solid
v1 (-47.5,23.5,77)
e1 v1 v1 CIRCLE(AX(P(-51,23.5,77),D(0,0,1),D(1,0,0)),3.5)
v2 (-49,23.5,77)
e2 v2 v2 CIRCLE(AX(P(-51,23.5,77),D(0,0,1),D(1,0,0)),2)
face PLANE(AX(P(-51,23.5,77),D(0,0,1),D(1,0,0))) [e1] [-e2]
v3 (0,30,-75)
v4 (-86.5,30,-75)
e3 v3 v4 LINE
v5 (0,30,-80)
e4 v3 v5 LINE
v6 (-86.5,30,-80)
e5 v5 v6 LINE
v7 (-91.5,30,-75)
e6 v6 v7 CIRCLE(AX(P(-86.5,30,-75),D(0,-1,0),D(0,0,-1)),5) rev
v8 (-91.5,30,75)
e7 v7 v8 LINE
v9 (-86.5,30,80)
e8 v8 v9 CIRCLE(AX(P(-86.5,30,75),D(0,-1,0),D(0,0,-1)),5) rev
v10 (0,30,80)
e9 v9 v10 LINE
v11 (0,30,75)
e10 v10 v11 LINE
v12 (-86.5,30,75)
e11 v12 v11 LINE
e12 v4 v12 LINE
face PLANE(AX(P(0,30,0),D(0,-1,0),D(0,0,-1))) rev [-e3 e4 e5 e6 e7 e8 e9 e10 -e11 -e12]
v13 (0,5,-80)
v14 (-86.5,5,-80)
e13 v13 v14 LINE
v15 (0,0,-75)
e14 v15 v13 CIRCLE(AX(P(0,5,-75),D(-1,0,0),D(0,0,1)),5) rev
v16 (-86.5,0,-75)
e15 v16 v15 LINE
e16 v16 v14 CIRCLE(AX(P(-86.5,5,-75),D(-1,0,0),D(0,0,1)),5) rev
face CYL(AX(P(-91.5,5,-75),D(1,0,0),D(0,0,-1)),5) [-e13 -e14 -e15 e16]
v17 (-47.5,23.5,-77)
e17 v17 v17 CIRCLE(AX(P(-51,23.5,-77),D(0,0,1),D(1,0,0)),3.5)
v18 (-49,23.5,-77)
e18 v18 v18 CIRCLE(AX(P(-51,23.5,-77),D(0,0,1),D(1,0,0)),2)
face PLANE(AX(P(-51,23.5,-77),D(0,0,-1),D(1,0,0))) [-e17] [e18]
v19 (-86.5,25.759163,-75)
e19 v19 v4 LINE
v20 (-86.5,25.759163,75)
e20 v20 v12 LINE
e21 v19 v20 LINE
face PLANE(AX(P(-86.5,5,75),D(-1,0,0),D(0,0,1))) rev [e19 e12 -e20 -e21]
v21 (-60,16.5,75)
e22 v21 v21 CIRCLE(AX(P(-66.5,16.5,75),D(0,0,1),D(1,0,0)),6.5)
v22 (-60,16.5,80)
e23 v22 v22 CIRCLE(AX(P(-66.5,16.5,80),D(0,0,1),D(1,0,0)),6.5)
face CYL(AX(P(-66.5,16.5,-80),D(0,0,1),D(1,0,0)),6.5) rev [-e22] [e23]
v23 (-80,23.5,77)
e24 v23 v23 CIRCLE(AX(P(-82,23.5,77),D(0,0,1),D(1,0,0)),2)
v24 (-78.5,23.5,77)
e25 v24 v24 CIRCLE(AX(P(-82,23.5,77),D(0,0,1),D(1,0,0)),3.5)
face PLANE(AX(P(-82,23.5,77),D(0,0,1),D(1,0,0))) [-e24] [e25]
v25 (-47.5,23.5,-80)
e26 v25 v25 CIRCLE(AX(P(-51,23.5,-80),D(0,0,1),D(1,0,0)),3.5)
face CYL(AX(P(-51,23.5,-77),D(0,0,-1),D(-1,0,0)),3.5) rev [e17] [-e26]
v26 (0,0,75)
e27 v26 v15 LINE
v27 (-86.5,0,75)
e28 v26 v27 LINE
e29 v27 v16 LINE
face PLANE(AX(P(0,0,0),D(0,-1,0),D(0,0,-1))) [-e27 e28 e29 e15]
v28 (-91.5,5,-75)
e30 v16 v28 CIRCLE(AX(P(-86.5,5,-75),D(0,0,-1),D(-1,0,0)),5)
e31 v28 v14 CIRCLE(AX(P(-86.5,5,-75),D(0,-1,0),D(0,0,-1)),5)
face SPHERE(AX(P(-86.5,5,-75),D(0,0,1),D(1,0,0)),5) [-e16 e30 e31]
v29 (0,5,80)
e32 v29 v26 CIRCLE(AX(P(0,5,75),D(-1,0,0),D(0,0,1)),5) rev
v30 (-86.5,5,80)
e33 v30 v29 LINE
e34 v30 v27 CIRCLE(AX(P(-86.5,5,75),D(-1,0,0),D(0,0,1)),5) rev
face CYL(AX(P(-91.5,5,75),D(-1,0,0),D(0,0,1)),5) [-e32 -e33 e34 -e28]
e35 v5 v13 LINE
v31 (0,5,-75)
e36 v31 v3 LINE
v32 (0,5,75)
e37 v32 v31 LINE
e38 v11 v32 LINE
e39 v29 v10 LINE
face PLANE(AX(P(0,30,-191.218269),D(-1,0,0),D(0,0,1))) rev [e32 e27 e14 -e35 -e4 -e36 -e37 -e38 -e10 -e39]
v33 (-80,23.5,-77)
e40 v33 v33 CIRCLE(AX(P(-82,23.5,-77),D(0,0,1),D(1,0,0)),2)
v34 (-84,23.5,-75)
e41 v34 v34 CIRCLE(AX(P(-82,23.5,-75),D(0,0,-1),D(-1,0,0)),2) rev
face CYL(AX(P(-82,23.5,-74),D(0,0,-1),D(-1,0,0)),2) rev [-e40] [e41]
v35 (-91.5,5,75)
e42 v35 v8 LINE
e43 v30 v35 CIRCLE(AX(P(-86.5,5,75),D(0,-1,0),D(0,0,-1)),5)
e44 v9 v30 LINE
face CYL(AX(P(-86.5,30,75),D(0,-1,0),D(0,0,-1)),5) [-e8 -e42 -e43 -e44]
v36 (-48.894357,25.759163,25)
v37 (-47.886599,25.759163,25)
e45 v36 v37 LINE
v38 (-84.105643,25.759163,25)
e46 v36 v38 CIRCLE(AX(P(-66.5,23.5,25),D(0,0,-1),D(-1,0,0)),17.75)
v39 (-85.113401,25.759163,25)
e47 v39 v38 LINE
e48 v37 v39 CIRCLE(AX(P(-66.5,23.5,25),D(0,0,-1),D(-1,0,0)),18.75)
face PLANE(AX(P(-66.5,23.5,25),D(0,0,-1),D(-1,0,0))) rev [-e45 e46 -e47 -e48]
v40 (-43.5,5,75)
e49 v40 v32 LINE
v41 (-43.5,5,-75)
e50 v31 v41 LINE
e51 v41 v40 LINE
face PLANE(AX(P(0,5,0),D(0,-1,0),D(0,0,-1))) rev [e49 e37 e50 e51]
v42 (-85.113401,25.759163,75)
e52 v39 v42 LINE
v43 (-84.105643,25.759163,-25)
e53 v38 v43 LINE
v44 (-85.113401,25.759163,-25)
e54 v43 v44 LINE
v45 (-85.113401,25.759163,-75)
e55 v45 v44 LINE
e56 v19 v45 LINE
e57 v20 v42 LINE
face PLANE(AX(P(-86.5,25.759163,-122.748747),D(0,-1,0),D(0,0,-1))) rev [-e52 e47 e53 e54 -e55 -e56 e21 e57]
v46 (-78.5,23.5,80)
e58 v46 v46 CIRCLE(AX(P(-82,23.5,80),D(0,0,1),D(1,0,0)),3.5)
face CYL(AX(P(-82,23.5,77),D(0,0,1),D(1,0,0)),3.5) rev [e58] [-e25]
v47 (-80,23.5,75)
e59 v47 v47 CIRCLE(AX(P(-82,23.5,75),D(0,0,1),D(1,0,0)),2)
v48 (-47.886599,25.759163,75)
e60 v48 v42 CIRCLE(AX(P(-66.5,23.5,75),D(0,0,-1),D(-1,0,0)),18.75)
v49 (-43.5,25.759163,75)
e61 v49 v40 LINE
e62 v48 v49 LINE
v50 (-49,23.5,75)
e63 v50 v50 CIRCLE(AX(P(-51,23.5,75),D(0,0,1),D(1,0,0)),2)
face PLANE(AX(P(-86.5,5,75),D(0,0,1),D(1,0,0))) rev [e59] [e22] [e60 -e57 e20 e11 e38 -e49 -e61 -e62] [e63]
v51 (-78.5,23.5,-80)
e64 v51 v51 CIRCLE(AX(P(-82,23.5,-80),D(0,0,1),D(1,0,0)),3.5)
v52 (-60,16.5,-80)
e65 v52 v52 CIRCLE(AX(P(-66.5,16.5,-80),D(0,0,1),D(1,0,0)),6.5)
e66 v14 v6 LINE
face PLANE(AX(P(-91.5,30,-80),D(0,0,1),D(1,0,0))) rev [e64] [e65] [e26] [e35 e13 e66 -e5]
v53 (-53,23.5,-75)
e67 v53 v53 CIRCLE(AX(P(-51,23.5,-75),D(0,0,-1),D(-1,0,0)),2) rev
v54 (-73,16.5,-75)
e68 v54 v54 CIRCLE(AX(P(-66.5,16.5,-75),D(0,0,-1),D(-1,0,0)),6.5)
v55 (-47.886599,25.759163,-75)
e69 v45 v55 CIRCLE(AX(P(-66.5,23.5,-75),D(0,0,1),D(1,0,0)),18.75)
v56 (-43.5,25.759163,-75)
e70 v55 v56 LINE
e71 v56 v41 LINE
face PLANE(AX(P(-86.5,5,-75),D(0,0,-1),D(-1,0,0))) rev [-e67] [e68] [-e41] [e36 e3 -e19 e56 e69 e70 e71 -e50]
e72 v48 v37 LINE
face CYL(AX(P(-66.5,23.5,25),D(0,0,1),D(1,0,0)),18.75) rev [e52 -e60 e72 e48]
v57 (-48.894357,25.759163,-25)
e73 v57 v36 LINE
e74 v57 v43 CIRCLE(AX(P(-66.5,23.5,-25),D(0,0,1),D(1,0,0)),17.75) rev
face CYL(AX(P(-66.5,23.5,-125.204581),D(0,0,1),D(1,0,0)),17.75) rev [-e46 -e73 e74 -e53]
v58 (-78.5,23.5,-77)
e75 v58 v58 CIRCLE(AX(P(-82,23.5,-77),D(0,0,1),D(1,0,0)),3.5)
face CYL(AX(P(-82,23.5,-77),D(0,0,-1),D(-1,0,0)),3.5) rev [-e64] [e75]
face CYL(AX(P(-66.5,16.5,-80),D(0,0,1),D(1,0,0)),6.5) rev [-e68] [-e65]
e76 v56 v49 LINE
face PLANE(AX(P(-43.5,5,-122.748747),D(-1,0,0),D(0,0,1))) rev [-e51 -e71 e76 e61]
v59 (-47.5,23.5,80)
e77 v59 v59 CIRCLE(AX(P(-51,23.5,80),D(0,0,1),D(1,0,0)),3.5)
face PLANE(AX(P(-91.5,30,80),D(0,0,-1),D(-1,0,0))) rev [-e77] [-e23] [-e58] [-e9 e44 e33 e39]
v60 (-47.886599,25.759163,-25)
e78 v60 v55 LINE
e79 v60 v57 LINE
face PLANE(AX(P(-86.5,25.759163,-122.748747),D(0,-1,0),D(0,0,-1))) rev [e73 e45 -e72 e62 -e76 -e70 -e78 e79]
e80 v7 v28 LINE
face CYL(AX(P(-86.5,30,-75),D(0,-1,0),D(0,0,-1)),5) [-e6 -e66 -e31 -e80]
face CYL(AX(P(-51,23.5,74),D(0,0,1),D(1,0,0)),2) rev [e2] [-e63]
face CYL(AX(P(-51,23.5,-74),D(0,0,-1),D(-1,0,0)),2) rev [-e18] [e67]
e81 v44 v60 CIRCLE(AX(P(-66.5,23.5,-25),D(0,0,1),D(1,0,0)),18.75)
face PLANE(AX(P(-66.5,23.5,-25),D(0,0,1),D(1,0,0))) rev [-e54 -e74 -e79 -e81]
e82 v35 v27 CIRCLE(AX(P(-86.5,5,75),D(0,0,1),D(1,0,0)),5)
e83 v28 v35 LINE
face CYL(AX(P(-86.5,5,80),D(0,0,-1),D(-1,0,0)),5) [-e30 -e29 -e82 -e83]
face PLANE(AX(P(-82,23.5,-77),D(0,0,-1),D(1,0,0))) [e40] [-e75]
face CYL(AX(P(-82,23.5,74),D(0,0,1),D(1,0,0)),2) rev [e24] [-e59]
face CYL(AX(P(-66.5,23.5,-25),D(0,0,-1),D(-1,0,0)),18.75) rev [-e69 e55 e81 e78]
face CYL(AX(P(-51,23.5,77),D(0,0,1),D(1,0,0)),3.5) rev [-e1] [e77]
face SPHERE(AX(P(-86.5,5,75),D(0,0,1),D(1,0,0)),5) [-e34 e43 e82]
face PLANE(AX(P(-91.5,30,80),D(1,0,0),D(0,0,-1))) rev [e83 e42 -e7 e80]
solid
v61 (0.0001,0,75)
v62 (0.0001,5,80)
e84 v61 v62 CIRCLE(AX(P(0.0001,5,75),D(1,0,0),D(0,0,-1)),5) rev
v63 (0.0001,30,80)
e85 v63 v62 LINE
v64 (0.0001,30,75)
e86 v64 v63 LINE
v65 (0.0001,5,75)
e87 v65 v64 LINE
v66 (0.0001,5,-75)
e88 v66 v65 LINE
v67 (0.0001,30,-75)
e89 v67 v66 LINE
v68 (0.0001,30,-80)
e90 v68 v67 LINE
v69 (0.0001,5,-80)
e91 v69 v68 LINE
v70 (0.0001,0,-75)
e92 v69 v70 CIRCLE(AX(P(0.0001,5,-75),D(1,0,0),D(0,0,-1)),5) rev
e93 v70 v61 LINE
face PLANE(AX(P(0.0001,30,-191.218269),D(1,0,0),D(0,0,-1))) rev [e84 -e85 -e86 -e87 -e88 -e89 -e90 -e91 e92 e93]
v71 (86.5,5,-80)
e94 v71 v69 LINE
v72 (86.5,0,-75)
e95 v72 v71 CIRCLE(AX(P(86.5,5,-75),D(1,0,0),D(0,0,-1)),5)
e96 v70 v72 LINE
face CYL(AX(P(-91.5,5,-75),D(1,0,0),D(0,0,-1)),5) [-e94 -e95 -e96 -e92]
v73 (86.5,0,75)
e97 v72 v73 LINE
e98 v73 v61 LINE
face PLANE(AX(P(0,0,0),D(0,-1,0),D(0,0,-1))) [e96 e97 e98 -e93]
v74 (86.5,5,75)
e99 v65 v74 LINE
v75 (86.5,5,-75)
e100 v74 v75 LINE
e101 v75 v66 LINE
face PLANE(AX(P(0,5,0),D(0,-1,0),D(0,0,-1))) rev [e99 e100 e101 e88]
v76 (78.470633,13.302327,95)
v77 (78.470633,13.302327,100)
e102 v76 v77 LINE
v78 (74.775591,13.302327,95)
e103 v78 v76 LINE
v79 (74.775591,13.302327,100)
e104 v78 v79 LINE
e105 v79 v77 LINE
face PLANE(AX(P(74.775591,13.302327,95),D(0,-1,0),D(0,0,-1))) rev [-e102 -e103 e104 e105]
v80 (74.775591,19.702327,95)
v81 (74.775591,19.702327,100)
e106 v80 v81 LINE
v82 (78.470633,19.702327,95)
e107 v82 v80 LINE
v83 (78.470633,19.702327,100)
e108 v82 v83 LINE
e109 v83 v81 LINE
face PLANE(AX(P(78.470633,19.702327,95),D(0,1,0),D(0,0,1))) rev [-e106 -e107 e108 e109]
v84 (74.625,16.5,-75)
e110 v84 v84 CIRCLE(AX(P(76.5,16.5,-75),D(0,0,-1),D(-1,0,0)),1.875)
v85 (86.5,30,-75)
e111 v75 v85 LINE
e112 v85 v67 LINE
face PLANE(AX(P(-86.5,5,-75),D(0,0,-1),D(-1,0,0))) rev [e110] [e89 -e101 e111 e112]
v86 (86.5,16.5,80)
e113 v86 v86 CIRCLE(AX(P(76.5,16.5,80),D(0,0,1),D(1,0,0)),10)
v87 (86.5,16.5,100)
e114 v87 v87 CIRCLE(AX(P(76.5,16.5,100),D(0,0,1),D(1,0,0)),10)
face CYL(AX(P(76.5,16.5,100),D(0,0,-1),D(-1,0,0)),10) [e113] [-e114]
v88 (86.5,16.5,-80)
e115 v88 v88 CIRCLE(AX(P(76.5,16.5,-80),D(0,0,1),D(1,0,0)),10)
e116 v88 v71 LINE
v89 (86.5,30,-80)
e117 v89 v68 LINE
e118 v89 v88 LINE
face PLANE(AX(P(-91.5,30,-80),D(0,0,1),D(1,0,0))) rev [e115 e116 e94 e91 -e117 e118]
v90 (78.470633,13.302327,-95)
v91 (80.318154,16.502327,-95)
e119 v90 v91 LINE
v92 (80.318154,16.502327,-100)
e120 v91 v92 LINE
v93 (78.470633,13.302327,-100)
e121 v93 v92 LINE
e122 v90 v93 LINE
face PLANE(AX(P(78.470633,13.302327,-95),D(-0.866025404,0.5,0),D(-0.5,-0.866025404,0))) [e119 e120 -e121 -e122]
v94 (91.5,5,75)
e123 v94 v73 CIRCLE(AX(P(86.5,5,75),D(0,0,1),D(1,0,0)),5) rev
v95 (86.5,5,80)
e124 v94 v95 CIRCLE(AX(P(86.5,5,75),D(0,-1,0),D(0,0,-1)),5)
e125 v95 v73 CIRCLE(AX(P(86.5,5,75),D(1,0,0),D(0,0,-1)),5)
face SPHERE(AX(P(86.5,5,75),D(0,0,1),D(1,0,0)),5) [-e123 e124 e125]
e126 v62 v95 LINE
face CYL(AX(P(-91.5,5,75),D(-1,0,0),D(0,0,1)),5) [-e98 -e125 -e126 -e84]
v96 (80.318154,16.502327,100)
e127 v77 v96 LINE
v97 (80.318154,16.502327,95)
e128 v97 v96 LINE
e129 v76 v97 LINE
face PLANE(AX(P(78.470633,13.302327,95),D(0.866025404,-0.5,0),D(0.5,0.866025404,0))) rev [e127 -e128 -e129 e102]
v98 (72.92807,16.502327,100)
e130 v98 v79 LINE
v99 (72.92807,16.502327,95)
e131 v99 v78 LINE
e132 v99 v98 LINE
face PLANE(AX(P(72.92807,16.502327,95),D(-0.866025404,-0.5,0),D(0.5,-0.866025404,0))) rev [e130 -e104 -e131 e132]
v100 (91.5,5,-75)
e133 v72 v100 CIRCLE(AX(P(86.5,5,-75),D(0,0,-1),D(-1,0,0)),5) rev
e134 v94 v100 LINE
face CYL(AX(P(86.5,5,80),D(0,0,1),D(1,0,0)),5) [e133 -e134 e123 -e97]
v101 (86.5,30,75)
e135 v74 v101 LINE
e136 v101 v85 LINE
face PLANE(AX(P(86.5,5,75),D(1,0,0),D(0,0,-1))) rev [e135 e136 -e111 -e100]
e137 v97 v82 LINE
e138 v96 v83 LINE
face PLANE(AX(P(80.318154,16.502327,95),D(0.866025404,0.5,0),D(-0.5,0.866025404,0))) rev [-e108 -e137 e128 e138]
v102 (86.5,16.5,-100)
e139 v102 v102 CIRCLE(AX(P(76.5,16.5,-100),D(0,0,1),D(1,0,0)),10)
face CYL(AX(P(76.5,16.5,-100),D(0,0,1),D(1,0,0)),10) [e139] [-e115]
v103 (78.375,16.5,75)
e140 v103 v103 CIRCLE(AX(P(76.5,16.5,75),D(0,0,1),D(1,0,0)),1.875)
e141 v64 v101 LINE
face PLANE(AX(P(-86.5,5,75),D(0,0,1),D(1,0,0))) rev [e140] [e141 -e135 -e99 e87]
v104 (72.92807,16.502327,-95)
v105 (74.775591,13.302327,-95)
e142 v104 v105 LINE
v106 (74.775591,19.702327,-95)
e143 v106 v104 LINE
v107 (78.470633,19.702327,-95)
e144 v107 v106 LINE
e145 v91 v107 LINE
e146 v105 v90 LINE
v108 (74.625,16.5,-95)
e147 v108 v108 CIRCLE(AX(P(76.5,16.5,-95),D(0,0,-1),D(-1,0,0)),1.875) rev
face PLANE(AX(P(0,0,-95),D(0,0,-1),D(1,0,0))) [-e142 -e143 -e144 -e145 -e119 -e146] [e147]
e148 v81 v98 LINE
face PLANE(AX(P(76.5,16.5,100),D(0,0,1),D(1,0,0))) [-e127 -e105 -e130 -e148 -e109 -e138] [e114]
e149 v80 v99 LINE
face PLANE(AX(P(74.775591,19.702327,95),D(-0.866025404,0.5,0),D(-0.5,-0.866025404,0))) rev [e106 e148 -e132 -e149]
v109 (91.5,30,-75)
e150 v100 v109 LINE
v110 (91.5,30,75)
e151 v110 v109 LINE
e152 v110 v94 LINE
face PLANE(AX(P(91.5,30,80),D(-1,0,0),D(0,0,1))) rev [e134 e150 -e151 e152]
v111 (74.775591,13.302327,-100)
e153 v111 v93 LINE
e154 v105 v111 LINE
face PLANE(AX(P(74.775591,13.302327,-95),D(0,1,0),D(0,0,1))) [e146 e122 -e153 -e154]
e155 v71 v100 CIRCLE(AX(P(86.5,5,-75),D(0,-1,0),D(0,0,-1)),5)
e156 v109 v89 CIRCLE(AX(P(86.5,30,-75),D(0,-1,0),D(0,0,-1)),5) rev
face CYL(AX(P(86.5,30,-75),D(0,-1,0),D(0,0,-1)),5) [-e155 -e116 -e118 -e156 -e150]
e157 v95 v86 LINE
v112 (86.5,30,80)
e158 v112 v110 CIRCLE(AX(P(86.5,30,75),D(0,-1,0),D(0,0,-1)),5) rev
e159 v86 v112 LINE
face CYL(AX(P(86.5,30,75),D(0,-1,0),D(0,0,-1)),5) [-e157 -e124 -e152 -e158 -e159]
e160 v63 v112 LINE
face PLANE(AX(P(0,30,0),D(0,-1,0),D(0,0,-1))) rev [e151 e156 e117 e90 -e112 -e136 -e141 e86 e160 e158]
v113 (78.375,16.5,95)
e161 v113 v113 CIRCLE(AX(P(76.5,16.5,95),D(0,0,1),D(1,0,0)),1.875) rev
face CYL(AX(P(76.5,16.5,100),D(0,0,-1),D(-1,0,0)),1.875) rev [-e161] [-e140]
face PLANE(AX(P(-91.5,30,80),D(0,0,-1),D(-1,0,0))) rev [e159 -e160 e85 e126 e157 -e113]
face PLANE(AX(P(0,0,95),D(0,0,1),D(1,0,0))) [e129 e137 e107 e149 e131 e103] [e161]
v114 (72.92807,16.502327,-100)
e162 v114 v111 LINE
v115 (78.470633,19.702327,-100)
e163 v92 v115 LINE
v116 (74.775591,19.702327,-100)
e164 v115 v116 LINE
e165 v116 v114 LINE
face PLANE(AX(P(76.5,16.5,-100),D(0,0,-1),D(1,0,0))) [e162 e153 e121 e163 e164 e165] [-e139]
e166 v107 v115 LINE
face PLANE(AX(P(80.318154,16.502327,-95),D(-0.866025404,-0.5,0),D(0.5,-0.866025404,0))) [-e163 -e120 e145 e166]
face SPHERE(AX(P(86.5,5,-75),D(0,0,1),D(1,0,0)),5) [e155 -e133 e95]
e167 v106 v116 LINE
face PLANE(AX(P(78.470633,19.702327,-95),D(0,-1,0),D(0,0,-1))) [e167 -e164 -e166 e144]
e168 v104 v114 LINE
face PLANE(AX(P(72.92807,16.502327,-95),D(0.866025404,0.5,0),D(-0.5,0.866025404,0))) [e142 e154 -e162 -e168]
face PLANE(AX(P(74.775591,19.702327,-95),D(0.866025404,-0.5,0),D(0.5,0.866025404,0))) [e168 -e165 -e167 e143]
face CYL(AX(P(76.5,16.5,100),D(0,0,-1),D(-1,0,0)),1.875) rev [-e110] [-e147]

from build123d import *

# Parameters (mm, degrees)
SKETCH5_W                = 183
SKETCH5_H                = 160
BOSS_EXTRUDE3_DEPTH      = 30
SKETCH6_W                = 173
SKETCH6_H                = 150
CUT_EXTRUDE1_DEPTH       = 25
SKETCH7_R                = 6.5
SKETCH7_R_2              = 1
CUT_EXTRUDE2_DEPTH       = 187.741130981
SKETCH11_W               = 43
SKETCH11_H               = 20.759163428
BOSS_EXTRUDE4_DEPTH      = 150
SKETCH8_R                = 18.75
CUT_EXTRUDE4_DEPTH       = 50
SKETCH12_R               = 17.75
CUT_EXTRUDE5_DEPTH       = 100
SKETCH13_R               = 3.5
CUT_EXTRUDE6_DEPTH       = 3
SKETCH14_R               = 2
CUT_EXTRUDE7_DEPTH       = 3
FILLET1_R                = 5
CUT_EXTRUDE8_DEPTH       = 0.0001
CUT_EXTRUDE9_START       = 50
SKETCH16_R               = 18.75
CUT_EXTRUDE9_DEPTH       = 50
SKETCH17_R               = 10
BOSS_EXTRUDE5_DEPTH      = 20
CUT_EXTRUDE10_DEPTH      = 200.742959826
CUT_EXTRUDE10_DEPTH_BACK = 200.742959826
SKETCH18_R               = 1.875
CUT_EXTRUDE11_DEPTH      = 5


# Read off the part's stored shape, not the designer's step: Cut-Extrude8
with BuildPart() as part:
    # Sketch5 → Boss-Extrude3 (new body)
    with BuildSketch(Plane(origin=(0, 0, 0), x_dir=(1, 0, 0), z_dir=(0, 1, 0))):
        Rectangle(SKETCH5_W, SKETCH5_H)
    extrude(amount=BOSS_EXTRUDE3_DEPTH)

    # Sketch6 → Cut-Extrude1 (cut)
    with BuildSketch(Plane(origin=(0, 30, 0), x_dir=(1, 0, 0), z_dir=(0, 1, 0))):
        Rectangle(SKETCH6_W, SKETCH6_H)
    extrude(amount=-CUT_EXTRUDE1_DEPTH, mode=Mode.SUBTRACT)

    # Sketch7 → Cut-Extrude2 (cut, through all)
    with BuildSketch(Plane.XY.offset(80)):
        with Locations((-66.5, 16.5)):
            Circle(SKETCH7_R)
        with Locations((76.5, 16.5)):
            Circle(SKETCH7_R_2)
    extrude(amount=-CUT_EXTRUDE2_DEPTH, mode=Mode.SUBTRACT)

    # Sketch11 → Boss-Extrude4 (add)
    with BuildSketch(Plane(origin=(0, 0, 75), x_dir=(-1, 0, 0), z_dir=(0, 0, -1))):
        with Locations((65, 15.379581714)):
            Rectangle(SKETCH11_W, SKETCH11_H)
    extrude(amount=BOSS_EXTRUDE4_DEPTH)

    # Sketch8 → Cut-Extrude4 (cut)
    with BuildSketch(Plane(origin=(0, 0, 75), x_dir=(-1, 0, 0), z_dir=(0, 0, -1))):
        with Locations((66.5, 23.5)):
            Circle(SKETCH8_R)
    extrude(amount=CUT_EXTRUDE4_DEPTH, mode=Mode.SUBTRACT)

    # Sketch12 → Cut-Extrude5 (cut)
    with BuildSketch(Plane.XY.offset(25)):
        with Locations((-66.5, 23.5)):
            Circle(SKETCH12_R)
    extrude(amount=-CUT_EXTRUDE5_DEPTH, mode=Mode.SUBTRACT)

    # Sketch13 → Cut-Extrude6 (cut)
    with BuildSketch(Plane.XY.offset(80)):
        with Locations((-51, 23.5)):
            Circle(SKETCH13_R)
        with Locations((-82, 23.5)):
            Circle(SKETCH13_R)
    cut_extrude6 = extrude(amount=-CUT_EXTRUDE6_DEPTH, mode=Mode.SUBTRACT)

    # Sketch14 → Cut-Extrude7 (cut)
    with BuildSketch(Plane.XY.offset(77)):
        with Locations((-51, 23.5)):
            Circle(SKETCH14_R)
        with Locations((-82, 23.5)):
            Circle(SKETCH14_R)
    cut_extrude7 = extrude(amount=-CUT_EXTRUDE7_DEPTH, mode=Mode.SUBTRACT)

    # Mirror2: Cut-Extrude6, Cut-Extrude7 across plane
    add(cut_extrude6.mirror(Plane.XY), mode=Mode.SUBTRACT)
    add(cut_extrude7.mirror(Plane.XY), mode=Mode.SUBTRACT)

    # Fillet1
    fillet1_edges = [part.edges().sort_by_distance(p)[0] for p in [
        (0, 0, 80),
        (-91.5, 0, 0),
        (0, 0, -80),
        (91.5, 0, 0),
        (91.5, 15, 80),
        (-91.5, 15, 80),
        (-91.5, 15, -80),
        (91.5, 15, -80),
    ]]
    fillet(fillet1_edges, radius=FILLET1_R)

    # Cut-Extrude8 outline → Cut-Extrude8 (cut)
    with BuildSketch(Plane.YZ):
        with BuildLine():
            Line((5, 75), (30, 75))
            Line((30, 75), (30, 80))
            Line((30, 80), (5, 80))
            ThreePointArc((5, 80), (1.464466094, 78.535533906), (0, 75))
            Line((0, 75), (0, -75))
            ThreePointArc((0, -75), (1.464466094, -78.535533906), (5, -80))
            Line((5, -80), (30, -80))
            Line((30, -80), (30, -75))
            Line((30, -75), (5, -75))
            Line((5, -75), (5, 75))
        make_face()
    extrude(amount=CUT_EXTRUDE8_DEPTH, mode=Mode.SUBTRACT)

    # Sketch16 → Cut-Extrude9 (cut)
    with BuildSketch(Plane.XY.offset(-75).offset(CUT_EXTRUDE9_START)):
        with Locations((-66.5, 23.5)):
            Circle(SKETCH16_R)
    extrude(amount=-CUT_EXTRUDE9_DEPTH, mode=Mode.SUBTRACT)

    # Sketch17 → Boss-Extrude5 (add)
    with BuildSketch(Plane.XY.offset(80)):
        with Locations((76.5, 16.5)):
            Circle(SKETCH17_R)
    boss_extrude5 = extrude(amount=BOSS_EXTRUDE5_DEPTH)

    # Mirror3: Boss-Extrude5 across plane
    add(boss_extrude5.mirror(Plane.XY))

    # Sketch18 → Cut-Extrude10 (cut, two sides: drawn at the far end of the back side and taken through both)
    with BuildSketch(Plane(origin=(0, 0, 75), x_dir=(-1, 0, 0), z_dir=(0, 0, -1)).offset(-CUT_EXTRUDE10_DEPTH_BACK)):
        with Locations((-76.5, 16.5)):
            Circle(SKETCH18_R)
    extrude(amount=CUT_EXTRUDE10_DEPTH + CUT_EXTRUDE10_DEPTH_BACK, mode=Mode.SUBTRACT)

    # Sketch19 → Cut-Extrude11 (cut)
    with BuildSketch(Plane.XY.offset(100)):
        Polygon((80.318153676, 16.502326977), (78.470632815, 19.702326977), (74.775591092, 19.702326977), (72.92807023, 16.502326977), (74.775591092, 13.302326977), (78.470632815, 13.302326977), align=None)
    cut_extrude11 = extrude(amount=-CUT_EXTRUDE11_DEPTH, mode=Mode.SUBTRACT)

    # Mirror4: Cut-Extrude11 across plane
    add(cut_extrude11.mirror(Plane.XY), mode=Mode.SUBTRACT)


solid = part.part
